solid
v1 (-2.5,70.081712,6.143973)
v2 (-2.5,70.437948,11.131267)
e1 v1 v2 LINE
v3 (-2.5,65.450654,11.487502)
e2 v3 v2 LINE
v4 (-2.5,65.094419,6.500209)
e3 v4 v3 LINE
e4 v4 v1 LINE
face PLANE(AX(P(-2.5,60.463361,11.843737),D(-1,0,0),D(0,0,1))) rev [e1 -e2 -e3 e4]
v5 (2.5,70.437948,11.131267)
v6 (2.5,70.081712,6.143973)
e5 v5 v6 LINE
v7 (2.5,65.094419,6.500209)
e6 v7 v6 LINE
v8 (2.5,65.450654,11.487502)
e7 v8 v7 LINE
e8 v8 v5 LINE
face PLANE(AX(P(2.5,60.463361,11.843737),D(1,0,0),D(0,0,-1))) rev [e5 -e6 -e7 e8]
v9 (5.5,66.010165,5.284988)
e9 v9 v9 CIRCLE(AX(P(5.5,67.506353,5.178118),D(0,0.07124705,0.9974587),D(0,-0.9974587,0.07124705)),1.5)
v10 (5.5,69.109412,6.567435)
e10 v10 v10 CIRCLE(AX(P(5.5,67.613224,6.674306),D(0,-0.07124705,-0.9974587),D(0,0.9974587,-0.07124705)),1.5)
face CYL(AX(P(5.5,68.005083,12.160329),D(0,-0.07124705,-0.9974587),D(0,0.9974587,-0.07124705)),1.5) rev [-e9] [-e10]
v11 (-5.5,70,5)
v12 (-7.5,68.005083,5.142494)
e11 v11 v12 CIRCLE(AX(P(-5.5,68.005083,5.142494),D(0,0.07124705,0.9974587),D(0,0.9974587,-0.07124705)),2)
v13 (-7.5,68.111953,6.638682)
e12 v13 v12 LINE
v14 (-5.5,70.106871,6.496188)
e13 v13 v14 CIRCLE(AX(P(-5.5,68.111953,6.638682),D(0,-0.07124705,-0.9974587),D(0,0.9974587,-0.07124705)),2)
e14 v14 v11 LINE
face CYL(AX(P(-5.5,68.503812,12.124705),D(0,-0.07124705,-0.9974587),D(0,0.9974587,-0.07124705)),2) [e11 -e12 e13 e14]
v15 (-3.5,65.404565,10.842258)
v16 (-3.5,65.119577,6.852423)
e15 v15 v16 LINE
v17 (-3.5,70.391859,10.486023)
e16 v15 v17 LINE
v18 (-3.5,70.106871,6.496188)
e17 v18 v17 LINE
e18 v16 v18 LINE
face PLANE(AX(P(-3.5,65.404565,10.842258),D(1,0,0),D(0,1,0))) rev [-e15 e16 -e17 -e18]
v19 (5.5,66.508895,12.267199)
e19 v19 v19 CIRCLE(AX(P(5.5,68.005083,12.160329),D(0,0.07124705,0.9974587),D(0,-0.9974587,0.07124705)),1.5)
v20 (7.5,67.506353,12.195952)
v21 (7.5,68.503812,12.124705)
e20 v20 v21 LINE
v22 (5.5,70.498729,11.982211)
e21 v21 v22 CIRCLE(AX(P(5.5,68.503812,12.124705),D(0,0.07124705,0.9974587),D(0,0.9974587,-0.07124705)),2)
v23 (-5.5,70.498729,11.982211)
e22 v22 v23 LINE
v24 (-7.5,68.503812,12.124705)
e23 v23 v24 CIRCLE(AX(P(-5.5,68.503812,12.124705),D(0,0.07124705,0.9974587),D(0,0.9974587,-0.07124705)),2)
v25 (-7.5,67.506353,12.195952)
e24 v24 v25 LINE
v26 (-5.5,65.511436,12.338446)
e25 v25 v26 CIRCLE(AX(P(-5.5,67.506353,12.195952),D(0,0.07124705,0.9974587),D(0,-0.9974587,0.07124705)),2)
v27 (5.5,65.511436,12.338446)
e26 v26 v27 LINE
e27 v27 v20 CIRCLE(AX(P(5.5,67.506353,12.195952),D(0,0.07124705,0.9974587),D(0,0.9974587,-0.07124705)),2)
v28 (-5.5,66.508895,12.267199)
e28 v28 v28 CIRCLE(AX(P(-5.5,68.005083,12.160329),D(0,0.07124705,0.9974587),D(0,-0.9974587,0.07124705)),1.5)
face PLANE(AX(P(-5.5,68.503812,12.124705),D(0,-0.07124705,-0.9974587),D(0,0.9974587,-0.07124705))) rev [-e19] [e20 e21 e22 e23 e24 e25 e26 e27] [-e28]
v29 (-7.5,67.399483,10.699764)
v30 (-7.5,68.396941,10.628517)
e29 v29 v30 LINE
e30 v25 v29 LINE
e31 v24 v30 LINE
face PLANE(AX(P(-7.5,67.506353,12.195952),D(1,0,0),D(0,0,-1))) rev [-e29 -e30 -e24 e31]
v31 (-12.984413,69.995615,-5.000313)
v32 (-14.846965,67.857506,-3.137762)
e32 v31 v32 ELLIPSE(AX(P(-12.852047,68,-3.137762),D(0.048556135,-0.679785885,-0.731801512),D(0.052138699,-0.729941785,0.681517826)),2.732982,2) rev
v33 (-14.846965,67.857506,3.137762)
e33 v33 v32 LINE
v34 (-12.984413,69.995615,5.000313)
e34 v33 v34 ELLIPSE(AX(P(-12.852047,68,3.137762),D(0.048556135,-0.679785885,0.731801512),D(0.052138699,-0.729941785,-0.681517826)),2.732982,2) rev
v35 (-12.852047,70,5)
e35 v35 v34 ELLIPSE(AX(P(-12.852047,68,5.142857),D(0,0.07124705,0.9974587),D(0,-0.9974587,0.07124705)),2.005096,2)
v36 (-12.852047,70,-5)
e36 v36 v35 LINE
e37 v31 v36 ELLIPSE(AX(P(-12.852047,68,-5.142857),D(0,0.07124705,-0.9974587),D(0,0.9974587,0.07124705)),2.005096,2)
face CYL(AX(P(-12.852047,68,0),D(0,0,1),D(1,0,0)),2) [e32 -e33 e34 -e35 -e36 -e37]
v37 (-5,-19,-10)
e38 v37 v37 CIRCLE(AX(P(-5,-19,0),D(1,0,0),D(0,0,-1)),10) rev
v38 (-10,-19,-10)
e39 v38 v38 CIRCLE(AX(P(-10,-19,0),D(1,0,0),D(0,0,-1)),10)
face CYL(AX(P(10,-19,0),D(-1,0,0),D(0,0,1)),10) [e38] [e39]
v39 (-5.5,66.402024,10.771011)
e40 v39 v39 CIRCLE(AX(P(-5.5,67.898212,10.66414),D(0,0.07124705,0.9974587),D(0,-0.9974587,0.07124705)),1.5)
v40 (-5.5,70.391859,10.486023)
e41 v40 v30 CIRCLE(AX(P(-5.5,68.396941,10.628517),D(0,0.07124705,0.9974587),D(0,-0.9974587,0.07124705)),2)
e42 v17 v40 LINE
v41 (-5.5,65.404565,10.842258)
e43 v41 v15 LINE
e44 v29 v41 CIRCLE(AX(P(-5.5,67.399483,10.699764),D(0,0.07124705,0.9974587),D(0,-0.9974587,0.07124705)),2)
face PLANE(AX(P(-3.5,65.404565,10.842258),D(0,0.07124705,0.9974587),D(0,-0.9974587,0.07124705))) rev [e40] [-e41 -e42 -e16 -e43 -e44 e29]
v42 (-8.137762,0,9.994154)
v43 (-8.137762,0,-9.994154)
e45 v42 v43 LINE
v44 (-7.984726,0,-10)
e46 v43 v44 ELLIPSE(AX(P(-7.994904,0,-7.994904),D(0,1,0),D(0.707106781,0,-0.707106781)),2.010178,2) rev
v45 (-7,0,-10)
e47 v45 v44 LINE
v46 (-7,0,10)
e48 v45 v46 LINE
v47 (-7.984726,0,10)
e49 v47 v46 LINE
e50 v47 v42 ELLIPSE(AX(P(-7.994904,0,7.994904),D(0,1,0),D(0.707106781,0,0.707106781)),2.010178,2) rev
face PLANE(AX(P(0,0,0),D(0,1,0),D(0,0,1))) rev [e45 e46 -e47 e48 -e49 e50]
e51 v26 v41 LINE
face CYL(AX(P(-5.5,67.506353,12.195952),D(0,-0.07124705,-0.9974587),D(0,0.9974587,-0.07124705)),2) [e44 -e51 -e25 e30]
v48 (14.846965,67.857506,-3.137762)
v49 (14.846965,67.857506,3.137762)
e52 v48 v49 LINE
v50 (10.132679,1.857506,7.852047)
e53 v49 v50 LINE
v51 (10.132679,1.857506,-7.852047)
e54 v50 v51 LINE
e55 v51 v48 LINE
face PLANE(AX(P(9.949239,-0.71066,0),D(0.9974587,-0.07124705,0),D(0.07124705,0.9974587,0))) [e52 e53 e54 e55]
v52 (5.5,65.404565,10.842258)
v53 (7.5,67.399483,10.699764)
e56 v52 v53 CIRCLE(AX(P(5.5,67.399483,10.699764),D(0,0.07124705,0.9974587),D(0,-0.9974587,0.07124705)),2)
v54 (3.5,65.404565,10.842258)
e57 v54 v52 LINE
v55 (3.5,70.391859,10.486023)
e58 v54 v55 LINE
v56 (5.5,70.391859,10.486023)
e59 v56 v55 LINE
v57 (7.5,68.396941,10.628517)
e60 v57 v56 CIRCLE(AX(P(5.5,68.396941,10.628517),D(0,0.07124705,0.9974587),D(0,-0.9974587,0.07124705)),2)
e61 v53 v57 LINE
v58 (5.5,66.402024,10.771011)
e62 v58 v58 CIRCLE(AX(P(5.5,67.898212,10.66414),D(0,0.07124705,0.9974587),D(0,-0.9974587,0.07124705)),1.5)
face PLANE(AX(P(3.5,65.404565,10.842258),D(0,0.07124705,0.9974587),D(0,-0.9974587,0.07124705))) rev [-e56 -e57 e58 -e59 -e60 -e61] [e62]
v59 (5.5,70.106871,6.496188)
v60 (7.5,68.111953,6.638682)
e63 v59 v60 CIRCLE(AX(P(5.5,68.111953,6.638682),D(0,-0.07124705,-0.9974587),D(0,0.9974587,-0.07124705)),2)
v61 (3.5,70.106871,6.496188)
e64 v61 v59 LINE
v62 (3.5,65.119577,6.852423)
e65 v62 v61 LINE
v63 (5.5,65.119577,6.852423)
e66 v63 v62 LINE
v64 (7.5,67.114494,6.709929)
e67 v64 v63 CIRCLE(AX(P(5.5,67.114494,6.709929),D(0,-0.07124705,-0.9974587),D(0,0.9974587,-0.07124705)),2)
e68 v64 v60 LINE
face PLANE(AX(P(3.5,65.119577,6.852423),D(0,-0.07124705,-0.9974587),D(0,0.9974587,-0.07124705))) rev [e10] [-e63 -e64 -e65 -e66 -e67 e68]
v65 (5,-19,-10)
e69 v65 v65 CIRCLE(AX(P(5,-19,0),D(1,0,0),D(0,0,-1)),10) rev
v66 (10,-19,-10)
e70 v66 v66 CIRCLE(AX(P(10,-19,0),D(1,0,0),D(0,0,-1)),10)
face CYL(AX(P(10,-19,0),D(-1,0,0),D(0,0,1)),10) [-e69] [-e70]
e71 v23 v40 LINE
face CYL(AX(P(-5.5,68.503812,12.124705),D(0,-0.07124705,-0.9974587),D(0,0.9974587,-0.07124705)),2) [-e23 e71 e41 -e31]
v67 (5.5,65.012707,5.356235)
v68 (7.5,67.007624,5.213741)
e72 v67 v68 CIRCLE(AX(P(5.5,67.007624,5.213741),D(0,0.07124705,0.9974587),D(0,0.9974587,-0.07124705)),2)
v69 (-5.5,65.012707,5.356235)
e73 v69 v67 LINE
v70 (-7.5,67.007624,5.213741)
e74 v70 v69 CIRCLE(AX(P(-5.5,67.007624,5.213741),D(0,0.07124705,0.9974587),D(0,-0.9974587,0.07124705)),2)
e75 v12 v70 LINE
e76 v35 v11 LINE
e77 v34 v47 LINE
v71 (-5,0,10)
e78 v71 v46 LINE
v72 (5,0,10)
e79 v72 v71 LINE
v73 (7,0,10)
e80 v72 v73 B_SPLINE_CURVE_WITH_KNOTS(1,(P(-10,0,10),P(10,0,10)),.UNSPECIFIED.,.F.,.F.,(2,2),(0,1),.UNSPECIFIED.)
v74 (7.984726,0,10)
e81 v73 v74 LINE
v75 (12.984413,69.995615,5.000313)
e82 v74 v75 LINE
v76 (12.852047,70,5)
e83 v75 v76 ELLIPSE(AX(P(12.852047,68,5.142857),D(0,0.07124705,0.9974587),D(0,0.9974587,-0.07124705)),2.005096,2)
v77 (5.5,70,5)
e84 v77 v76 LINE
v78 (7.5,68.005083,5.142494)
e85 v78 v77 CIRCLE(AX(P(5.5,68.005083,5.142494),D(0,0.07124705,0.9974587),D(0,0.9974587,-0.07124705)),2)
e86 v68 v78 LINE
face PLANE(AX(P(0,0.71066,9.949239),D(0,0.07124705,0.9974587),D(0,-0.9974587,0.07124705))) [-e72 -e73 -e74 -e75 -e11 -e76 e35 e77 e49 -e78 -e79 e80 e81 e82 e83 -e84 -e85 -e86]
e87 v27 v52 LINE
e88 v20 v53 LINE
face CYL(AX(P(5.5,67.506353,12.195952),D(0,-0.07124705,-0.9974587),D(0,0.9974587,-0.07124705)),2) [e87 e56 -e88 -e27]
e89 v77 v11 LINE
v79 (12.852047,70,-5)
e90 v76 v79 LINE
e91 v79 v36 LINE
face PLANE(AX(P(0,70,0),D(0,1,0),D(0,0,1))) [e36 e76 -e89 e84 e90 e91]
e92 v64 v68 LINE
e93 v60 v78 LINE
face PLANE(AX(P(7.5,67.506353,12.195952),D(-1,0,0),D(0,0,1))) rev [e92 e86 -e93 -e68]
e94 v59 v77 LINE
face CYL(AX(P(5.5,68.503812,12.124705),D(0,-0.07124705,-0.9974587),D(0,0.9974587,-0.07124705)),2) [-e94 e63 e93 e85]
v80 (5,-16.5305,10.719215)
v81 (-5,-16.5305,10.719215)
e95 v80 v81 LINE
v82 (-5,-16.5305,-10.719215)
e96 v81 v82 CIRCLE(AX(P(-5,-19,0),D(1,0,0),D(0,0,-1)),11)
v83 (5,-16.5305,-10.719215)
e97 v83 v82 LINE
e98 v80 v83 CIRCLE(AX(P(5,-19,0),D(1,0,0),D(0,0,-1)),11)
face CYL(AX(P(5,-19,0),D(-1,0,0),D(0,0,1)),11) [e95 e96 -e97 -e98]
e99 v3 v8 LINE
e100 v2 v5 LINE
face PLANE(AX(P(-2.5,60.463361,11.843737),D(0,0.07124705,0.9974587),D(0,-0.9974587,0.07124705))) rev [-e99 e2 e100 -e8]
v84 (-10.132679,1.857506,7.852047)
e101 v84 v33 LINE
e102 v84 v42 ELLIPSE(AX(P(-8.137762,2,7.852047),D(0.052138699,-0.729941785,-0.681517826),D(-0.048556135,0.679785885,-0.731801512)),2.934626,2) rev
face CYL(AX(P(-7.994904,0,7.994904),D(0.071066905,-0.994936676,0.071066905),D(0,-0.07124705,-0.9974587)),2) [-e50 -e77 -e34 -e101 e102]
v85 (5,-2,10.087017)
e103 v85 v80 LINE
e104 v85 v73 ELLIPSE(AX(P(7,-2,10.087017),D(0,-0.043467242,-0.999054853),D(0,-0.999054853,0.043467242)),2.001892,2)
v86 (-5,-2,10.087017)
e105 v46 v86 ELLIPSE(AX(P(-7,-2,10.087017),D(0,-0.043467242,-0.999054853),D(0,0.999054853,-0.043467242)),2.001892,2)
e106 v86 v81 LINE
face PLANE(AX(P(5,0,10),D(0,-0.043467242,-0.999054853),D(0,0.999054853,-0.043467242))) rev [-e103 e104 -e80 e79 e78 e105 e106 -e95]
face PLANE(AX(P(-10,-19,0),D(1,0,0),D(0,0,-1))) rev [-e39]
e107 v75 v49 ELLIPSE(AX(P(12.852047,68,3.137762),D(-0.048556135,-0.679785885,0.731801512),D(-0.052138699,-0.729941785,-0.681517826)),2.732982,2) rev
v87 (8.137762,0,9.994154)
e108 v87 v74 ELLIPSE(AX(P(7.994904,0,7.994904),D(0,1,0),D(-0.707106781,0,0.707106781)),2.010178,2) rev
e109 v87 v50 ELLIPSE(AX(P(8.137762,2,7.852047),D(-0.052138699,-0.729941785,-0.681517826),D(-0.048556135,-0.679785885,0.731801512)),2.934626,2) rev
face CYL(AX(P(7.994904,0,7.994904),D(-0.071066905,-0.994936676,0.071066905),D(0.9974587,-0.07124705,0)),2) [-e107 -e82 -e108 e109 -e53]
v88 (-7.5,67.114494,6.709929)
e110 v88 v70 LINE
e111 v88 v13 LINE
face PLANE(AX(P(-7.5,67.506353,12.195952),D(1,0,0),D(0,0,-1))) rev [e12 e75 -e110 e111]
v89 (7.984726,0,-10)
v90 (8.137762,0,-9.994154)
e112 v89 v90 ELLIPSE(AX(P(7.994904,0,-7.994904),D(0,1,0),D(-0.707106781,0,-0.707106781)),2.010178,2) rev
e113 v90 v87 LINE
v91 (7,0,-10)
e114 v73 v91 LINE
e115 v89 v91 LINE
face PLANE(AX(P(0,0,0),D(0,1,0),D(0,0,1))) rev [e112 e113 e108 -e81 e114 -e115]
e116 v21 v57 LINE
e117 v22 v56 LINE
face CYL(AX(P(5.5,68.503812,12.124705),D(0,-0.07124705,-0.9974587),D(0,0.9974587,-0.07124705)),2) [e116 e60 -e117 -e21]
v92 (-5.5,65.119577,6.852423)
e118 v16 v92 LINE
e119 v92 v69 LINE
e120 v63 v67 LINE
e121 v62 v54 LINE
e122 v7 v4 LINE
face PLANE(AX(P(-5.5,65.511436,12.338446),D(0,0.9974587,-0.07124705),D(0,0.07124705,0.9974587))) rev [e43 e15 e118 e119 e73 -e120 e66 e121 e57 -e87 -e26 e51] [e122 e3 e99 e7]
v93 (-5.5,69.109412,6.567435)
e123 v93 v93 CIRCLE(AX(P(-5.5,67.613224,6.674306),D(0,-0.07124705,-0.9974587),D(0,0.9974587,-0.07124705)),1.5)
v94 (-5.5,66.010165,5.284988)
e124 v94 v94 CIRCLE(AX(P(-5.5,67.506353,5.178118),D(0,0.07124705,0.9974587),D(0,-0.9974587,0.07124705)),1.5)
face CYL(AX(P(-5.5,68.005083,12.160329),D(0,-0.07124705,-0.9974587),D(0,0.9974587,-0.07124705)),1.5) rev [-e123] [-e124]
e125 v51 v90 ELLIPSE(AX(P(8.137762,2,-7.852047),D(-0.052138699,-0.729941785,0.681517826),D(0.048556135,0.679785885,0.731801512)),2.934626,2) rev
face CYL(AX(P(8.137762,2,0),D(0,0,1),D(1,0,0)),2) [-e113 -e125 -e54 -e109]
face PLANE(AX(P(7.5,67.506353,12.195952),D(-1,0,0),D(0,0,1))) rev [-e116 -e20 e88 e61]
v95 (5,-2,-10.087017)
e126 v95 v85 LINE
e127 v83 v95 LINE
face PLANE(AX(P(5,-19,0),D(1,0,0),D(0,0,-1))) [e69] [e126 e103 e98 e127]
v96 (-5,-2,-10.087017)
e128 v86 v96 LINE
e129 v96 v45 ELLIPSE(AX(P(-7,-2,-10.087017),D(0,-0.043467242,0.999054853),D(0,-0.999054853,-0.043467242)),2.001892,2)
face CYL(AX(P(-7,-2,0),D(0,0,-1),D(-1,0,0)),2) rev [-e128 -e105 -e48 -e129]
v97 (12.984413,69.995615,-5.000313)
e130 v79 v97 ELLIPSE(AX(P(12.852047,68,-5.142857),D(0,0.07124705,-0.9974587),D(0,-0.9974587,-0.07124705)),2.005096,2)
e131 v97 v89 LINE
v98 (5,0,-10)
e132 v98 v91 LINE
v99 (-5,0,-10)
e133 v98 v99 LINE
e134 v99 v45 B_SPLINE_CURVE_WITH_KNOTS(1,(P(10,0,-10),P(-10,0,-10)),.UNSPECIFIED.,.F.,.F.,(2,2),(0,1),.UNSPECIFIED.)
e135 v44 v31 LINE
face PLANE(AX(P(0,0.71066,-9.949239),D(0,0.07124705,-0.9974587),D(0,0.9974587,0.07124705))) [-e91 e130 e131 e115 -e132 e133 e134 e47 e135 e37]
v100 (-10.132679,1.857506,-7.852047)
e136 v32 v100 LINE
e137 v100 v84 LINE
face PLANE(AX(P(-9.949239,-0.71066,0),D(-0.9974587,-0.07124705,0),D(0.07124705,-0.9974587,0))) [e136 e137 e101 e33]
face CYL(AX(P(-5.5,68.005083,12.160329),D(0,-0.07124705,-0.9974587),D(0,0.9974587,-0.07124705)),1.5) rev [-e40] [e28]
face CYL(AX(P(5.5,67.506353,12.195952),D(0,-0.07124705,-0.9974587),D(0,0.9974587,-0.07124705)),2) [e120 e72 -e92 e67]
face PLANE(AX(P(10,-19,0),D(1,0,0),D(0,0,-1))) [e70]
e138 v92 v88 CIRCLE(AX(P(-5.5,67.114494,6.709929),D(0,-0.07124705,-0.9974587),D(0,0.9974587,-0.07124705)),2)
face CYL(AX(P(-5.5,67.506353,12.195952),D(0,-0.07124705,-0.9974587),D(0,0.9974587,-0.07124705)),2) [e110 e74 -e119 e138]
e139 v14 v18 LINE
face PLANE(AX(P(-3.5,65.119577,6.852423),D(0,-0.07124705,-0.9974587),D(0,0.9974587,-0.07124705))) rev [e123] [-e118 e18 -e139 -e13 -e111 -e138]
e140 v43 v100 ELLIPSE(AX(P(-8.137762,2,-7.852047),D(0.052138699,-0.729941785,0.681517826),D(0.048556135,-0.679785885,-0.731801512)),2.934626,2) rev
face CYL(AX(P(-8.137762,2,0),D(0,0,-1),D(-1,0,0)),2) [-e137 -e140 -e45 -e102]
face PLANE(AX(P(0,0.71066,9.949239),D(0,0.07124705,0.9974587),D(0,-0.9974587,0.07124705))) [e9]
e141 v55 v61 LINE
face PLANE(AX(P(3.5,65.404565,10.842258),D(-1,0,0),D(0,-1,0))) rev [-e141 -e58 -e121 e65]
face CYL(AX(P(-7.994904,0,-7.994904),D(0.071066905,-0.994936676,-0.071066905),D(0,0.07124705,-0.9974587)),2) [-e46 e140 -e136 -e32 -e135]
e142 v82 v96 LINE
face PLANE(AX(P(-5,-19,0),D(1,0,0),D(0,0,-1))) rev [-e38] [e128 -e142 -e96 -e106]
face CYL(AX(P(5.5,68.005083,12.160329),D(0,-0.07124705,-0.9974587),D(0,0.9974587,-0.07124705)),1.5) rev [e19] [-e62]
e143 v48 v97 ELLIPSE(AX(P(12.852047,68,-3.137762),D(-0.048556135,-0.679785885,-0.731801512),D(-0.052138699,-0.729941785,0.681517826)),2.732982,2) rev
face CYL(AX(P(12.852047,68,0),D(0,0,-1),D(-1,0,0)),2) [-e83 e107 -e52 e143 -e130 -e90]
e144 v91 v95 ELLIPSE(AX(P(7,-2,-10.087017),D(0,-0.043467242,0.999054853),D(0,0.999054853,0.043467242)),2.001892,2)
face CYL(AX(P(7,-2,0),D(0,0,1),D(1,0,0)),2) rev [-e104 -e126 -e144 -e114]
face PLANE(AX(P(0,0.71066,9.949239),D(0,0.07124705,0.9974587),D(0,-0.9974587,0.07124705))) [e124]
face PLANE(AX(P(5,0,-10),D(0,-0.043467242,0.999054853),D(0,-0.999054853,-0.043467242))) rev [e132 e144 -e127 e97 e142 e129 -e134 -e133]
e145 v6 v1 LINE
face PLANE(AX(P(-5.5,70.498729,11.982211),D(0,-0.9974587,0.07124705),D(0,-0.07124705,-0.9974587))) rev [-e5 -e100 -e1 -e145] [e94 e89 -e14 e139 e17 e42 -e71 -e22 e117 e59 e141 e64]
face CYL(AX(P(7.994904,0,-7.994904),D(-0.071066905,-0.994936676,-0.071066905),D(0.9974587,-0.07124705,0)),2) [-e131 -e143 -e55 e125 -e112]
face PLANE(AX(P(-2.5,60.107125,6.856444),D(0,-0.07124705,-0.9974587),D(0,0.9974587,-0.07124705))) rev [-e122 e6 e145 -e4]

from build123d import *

# Parameters (mm, degrees)
SALIENTE_EXTRUIR1_DEPTH = 5
CROQUIS5_R              = 10
SALIENTE_EXTRUIR2_DEPTH = 10
CROQUIS6_R              = 1.5
SALIENTE_EXTRUIR3_DEPTH = 7
CROQUIS7_W              = 4
CROQUIS7_H              = 4
CORTAR_EXTRUIR1_DEPTH   = 5
REDONDEO1_R             = 2
CROQUIS8_W              = 5
CROQUIS8_H              = 5
CORTAR_EXTRUIR2_DEPTH   = 10


with BuildPart() as part:
    # Croquis2 → Recubrir1 section 0
    with BuildSketch(Plane(origin=(0, 70, 0), x_dir=(1, 0, 0), z_dir=(0, 1, 0))):
        with BuildLine():
            Line((15, -5), (-15, -5))
            Line((-15, -5), (-15, 5))
            Line((-15, 5), (15, 5))
            Line((15, 5), (15, -5))
        make_face()
    # Croquis1 → Recubrir1 section 1
    with BuildSketch(Plane(origin=(0, 0, 0), x_dir=(1, 0, 0), z_dir=(0, 1, 0))):
        with BuildLine():
            Line((10, -10), (-10, -10))
            Line((-10, -10), (-10, 10))
            Line((-10, 10), (10, 10))
            Line((10, 10), (10, -10))
        make_face()
    loft()

    # Croquis4 → Saliente-Extruir1 (add, symmetric)
    with BuildSketch(Plane(origin=(0, 0, 0), x_dir=(0, 0, -1), z_dir=(1, 0, 0))):
        with BuildLine():
            Line((-10, 0), (-10.71921501, -16.530500138))
            ThreePointArc((-10.71921501, -16.530500138), (0, -30), (10.71921501, -16.530500138))
            Line((10.71921501, -16.530500138), (10, 0))
            Line((10, 0), (-10, 0))
        make_face()
    extrude(amount=SALIENTE_EXTRUIR1_DEPTH, both=True)

    # Croquis5 → Saliente-Extruir2 (add, symmetric)
    with BuildSketch(Plane(origin=(0, 0, 0), x_dir=(0, 0, -1), z_dir=(1, 0, 0))):
        with Locations((0, -19)):
            Circle(CROQUIS5_R)
    extrude(amount=SALIENTE_EXTRUIR2_DEPTH, both=True)

    # Croquis6 → Saliente-Extruir3 (add)
    with BuildSketch(Plane(origin=(0, 0.710659898, 9.949238579), x_dir=(1, 0, 0), z_dir=(0, 0.07124704998790965, 0.997458699830735))):
        with BuildLine():
            Line((-5.5, 64.465873738), (5.5, 64.465873738))
            ThreePointArc((5.5, 64.465873738), (6.914213562, 65.051660176), (7.5, 66.465873738))
            Line((7.5, 66.465873738), (7.5, 67.465873738))
            ThreePointArc((7.5, 67.465873738), (6.914213562, 68.880087301), (5.5, 69.465873738))
            Line((5.5, 69.465873738), (-5.5, 69.465873738))
            ThreePointArc((-5.5, 69.465873738), (-6.914213562, 68.880087301), (-7.5, 67.465873738))
            Line((-7.5, 67.465873738), (-7.5, 66.465873738))
            ThreePointArc((-7.5, 66.465873738), (-6.914213562, 65.051660176), (-5.5, 64.465873738))
        make_face()
        with Locations(Location((-5.5, 66.965873738, 0), (0, 0, 90))):
            Circle(CROQUIS6_R, mode=Mode.SUBTRACT)
        with Locations(Location((5.5, 66.965873738, 0), (0, 0, 90))):
            Circle(CROQUIS6_R, mode=Mode.SUBTRACT)
    extrude(amount=SALIENTE_EXTRUIR3_DEPTH)

    # Croquis7 → Cortar-Extruir1 (cut, symmetric)
    with BuildSketch(Plane(origin=(0, 69.289340102, -4.949238579), x_dir=(1, 0, 0), z_dir=(0, 0.997458699830735, -0.07124704998790966))):
        with Locations((-5.5, -13.474586998)):
            Rectangle(CROQUIS7_W, CROQUIS7_H)
        with Locations((5.5, -13.474586998)):
            Rectangle(CROQUIS7_W, CROQUIS7_H)
    extrude(amount=CORTAR_EXTRUIR1_DEPTH, both=True, mode=Mode.SUBTRACT)

    # Redondeo1
    # the kernel refuses this fillet: 2 mm, written as the material it adds along each edge
    with BuildSketch(Plane(origin=(-5, 0, -15), x_dir=(-1, 0, 0), z_dir=(0, 0, 1))) as redondeo1_piece_1_section:
        with BuildLine():
            CenterArc((REDONDEO1_R, REDONDEO1_R), REDONDEO1_R, 180, 90)
            Line((0, REDONDEO1_R), (0, 0))
            Line((0, 0), (REDONDEO1_R, 0))
        make_face()
    redondeo1_piece_1 = extrude(amount=30, mode=Mode.PRIVATE)
    redondeo1_piece_1 = split(redondeo1_piece_1, bisect_by=Plane(origin=(-5.45231098, -0.018481015, 10.000804079), z_dir=(0, -0.043467241760335076, -0.999054852795255)), keep=Keep.TOP, mode=Mode.PRIVATE)
    redondeo1_piece_1 = split(redondeo1_piece_1, bisect_by=Plane(origin=(-5.45231098, -0.018481001, -10.000804078), z_dir=(0, -0.04346724176032877, 0.9990548527952553)), keep=Keep.TOP, mode=Mode.PRIVATE)
    add(redondeo1_piece_1)
    with BuildSketch(Plane(origin=(5, 0, -15), x_dir=(1, 0, 0), z_dir=(0, 0, 1))) as redondeo1_piece_2_section:
        with BuildLine():
            CenterArc((REDONDEO1_R, -REDONDEO1_R), REDONDEO1_R, 90, 90)
            Line((0, -REDONDEO1_R), (0, 0))
            Line((0, 0), (REDONDEO1_R, 0))
        make_face()
    redondeo1_piece_2 = extrude(amount=30, mode=Mode.PRIVATE)
    redondeo1_piece_2 = split(redondeo1_piece_2, bisect_by=Plane(origin=(5.45231098, -0.018481001, 10.000804078), z_dir=(0, -0.043467241760335076, -0.999054852795255)), keep=Keep.TOP, mode=Mode.PRIVATE)
    redondeo1_piece_2 = split(redondeo1_piece_2, bisect_by=Plane(origin=(5.45231098, -0.018481015, -10.000804079), z_dir=(0, -0.04346724176032877, 0.9990548527952553)), keep=Keep.TOP, mode=Mode.PRIVATE)
    add(redondeo1_piece_2)
    # the kernel refuses this fillet: 2 mm, written as the material it takes off along each edge
    with BuildSketch(Plane(origin=(15, 70, -10.369881731), x_dir=(-1, 0, 0), z_dir=(0, 0, 1))) as redondeo1_2_piece_1:
        with BuildLine():
            CenterArc((REDONDEO1_R * 1.07397634626, REDONDEO1_R), REDONDEO1_R, 175.91438322, 94.08561678)
            Line((REDONDEO1_R * 0.0765176464277, REDONDEO1_R * 1.07124704999), (0, 0))
            Line((0, 0), (REDONDEO1_R * 1.07397634626, 0))
        make_face()
    extrude(amount=20.739763463, mode=Mode.SUBTRACT)
    with BuildSketch(Plane(origin=(15.357142857, 75, -4.642857143), x_dir=(-0.9974715509474419, 0.07088630311301622, 0.00506330736521557), z_dir=(-0.07106690545187021, -0.9949366763261821, -0.07106690545187017)), Plane(origin=(-15.357142857, 75, 4.642857143), x_dir=(0.9974715509474419, 0.07088630311301611, -0.005063307365215563), z_dir=(0.0710669054518701, -0.9949366763261821, 0.07106690545187014))) as redondeo1_2_piece_2:
        with BuildLine():
            CenterArc((REDONDEO1_R * 1.00508909139, -REDONDEO1_R), REDONDEO1_R, 90, 90.290842769)
            Line((REDONDEO1_R * 0.0051019750832, -REDONDEO1_R * 1.00507614213), (0, 0))
            Line((0, 0), (REDONDEO1_R * 1.00508909139, 0))
        make_face()
    extrude(amount=80.407127311, mode=Mode.SUBTRACT)
    with BuildSketch(Plane(origin=(10, 0, -14.655596017), x_dir=(-1, 0, 0), z_dir=(0, 0, 1)), Plane(origin=(-10, 0, 14.655596017), x_dir=(1, 0, 0), z_dir=(0, 0, -1))) as redondeo1_2_piece_3:
        with BuildLine():
            CenterArc((REDONDEO1_R * 0.931119203401, -REDONDEO1_R), REDONDEO1_R, 90, 85.91438322)
            Line((-REDONDEO1_R * 0.0663394964294, -REDONDEO1_R * 0.928752950012), (0, 0))
            Line((0, 0), (REDONDEO1_R * 0.931119203401, 0))
        make_face()
    extrude(amount=29.311192034, mode=Mode.SUBTRACT)
    with BuildSketch(Plane(origin=(15.357142857, 75, 4.642857143), x_dir=(-0.9974715509474419, 0.07088630311301623, -0.005063307365215571), z_dir=(-0.07106690545187021, -0.9949366763261821, 0.07106690545187014)), Plane(origin=(-15.357142857, 75, -4.642857143), x_dir=(0.9974715509474419, 0.07088630311301615, 0.005063307365215123), z_dir=(0.0710669054518701, -0.9949366763261821, -0.07106690545187017))) as redondeo1_2_piece_4:
        with BuildLine():
            CenterArc((REDONDEO1_R * 1.00508909139, REDONDEO1_R), REDONDEO1_R, 179.709157231, 90.290842769)
            Line((REDONDEO1_R * 0.0051019750832, REDONDEO1_R * 1.00507614213), (0, 0))
            Line((0, 0), (REDONDEO1_R * 1.00508909139, 0))
        make_face()
    extrude(amount=80.407127311, mode=Mode.SUBTRACT)
    with BuildSketch(Plane(origin=(-15, 70, 10.369881731), x_dir=(0.07124704998790952, -0.997458699830735, 0), z_dir=(0, 0, -1))) as redondeo1_2_piece_5:
        with BuildLine():
            CenterArc((REDONDEO1_R * 1.07397634626, -REDONDEO1_R), REDONDEO1_R, 90, 94.08561678)
            Line((REDONDEO1_R * 0.0765176464277, -REDONDEO1_R * 1.07124704999), (0, 0))
            Line((0, 0), (REDONDEO1_R * 1.07397634626, 0))
        make_face()
    extrude(amount=20.739763463, mode=Mode.SUBTRACT)

    # Croquis8 → Cortar-Extruir2 (cut)
    with BuildSketch(Plane(origin=(0, 69.289340102, -4.949238579), x_dir=(1, 0, 0), z_dir=(0, 0.997458699830735, -0.07124704998790966))):
        with Locations((0, -13.621474852)):
            Rectangle(CROQUIS8_W, CROQUIS8_H)
    extrude(amount=-CORTAR_EXTRUIR2_DEPTH, mode=Mode.SUBTRACT)


solid = part.part
